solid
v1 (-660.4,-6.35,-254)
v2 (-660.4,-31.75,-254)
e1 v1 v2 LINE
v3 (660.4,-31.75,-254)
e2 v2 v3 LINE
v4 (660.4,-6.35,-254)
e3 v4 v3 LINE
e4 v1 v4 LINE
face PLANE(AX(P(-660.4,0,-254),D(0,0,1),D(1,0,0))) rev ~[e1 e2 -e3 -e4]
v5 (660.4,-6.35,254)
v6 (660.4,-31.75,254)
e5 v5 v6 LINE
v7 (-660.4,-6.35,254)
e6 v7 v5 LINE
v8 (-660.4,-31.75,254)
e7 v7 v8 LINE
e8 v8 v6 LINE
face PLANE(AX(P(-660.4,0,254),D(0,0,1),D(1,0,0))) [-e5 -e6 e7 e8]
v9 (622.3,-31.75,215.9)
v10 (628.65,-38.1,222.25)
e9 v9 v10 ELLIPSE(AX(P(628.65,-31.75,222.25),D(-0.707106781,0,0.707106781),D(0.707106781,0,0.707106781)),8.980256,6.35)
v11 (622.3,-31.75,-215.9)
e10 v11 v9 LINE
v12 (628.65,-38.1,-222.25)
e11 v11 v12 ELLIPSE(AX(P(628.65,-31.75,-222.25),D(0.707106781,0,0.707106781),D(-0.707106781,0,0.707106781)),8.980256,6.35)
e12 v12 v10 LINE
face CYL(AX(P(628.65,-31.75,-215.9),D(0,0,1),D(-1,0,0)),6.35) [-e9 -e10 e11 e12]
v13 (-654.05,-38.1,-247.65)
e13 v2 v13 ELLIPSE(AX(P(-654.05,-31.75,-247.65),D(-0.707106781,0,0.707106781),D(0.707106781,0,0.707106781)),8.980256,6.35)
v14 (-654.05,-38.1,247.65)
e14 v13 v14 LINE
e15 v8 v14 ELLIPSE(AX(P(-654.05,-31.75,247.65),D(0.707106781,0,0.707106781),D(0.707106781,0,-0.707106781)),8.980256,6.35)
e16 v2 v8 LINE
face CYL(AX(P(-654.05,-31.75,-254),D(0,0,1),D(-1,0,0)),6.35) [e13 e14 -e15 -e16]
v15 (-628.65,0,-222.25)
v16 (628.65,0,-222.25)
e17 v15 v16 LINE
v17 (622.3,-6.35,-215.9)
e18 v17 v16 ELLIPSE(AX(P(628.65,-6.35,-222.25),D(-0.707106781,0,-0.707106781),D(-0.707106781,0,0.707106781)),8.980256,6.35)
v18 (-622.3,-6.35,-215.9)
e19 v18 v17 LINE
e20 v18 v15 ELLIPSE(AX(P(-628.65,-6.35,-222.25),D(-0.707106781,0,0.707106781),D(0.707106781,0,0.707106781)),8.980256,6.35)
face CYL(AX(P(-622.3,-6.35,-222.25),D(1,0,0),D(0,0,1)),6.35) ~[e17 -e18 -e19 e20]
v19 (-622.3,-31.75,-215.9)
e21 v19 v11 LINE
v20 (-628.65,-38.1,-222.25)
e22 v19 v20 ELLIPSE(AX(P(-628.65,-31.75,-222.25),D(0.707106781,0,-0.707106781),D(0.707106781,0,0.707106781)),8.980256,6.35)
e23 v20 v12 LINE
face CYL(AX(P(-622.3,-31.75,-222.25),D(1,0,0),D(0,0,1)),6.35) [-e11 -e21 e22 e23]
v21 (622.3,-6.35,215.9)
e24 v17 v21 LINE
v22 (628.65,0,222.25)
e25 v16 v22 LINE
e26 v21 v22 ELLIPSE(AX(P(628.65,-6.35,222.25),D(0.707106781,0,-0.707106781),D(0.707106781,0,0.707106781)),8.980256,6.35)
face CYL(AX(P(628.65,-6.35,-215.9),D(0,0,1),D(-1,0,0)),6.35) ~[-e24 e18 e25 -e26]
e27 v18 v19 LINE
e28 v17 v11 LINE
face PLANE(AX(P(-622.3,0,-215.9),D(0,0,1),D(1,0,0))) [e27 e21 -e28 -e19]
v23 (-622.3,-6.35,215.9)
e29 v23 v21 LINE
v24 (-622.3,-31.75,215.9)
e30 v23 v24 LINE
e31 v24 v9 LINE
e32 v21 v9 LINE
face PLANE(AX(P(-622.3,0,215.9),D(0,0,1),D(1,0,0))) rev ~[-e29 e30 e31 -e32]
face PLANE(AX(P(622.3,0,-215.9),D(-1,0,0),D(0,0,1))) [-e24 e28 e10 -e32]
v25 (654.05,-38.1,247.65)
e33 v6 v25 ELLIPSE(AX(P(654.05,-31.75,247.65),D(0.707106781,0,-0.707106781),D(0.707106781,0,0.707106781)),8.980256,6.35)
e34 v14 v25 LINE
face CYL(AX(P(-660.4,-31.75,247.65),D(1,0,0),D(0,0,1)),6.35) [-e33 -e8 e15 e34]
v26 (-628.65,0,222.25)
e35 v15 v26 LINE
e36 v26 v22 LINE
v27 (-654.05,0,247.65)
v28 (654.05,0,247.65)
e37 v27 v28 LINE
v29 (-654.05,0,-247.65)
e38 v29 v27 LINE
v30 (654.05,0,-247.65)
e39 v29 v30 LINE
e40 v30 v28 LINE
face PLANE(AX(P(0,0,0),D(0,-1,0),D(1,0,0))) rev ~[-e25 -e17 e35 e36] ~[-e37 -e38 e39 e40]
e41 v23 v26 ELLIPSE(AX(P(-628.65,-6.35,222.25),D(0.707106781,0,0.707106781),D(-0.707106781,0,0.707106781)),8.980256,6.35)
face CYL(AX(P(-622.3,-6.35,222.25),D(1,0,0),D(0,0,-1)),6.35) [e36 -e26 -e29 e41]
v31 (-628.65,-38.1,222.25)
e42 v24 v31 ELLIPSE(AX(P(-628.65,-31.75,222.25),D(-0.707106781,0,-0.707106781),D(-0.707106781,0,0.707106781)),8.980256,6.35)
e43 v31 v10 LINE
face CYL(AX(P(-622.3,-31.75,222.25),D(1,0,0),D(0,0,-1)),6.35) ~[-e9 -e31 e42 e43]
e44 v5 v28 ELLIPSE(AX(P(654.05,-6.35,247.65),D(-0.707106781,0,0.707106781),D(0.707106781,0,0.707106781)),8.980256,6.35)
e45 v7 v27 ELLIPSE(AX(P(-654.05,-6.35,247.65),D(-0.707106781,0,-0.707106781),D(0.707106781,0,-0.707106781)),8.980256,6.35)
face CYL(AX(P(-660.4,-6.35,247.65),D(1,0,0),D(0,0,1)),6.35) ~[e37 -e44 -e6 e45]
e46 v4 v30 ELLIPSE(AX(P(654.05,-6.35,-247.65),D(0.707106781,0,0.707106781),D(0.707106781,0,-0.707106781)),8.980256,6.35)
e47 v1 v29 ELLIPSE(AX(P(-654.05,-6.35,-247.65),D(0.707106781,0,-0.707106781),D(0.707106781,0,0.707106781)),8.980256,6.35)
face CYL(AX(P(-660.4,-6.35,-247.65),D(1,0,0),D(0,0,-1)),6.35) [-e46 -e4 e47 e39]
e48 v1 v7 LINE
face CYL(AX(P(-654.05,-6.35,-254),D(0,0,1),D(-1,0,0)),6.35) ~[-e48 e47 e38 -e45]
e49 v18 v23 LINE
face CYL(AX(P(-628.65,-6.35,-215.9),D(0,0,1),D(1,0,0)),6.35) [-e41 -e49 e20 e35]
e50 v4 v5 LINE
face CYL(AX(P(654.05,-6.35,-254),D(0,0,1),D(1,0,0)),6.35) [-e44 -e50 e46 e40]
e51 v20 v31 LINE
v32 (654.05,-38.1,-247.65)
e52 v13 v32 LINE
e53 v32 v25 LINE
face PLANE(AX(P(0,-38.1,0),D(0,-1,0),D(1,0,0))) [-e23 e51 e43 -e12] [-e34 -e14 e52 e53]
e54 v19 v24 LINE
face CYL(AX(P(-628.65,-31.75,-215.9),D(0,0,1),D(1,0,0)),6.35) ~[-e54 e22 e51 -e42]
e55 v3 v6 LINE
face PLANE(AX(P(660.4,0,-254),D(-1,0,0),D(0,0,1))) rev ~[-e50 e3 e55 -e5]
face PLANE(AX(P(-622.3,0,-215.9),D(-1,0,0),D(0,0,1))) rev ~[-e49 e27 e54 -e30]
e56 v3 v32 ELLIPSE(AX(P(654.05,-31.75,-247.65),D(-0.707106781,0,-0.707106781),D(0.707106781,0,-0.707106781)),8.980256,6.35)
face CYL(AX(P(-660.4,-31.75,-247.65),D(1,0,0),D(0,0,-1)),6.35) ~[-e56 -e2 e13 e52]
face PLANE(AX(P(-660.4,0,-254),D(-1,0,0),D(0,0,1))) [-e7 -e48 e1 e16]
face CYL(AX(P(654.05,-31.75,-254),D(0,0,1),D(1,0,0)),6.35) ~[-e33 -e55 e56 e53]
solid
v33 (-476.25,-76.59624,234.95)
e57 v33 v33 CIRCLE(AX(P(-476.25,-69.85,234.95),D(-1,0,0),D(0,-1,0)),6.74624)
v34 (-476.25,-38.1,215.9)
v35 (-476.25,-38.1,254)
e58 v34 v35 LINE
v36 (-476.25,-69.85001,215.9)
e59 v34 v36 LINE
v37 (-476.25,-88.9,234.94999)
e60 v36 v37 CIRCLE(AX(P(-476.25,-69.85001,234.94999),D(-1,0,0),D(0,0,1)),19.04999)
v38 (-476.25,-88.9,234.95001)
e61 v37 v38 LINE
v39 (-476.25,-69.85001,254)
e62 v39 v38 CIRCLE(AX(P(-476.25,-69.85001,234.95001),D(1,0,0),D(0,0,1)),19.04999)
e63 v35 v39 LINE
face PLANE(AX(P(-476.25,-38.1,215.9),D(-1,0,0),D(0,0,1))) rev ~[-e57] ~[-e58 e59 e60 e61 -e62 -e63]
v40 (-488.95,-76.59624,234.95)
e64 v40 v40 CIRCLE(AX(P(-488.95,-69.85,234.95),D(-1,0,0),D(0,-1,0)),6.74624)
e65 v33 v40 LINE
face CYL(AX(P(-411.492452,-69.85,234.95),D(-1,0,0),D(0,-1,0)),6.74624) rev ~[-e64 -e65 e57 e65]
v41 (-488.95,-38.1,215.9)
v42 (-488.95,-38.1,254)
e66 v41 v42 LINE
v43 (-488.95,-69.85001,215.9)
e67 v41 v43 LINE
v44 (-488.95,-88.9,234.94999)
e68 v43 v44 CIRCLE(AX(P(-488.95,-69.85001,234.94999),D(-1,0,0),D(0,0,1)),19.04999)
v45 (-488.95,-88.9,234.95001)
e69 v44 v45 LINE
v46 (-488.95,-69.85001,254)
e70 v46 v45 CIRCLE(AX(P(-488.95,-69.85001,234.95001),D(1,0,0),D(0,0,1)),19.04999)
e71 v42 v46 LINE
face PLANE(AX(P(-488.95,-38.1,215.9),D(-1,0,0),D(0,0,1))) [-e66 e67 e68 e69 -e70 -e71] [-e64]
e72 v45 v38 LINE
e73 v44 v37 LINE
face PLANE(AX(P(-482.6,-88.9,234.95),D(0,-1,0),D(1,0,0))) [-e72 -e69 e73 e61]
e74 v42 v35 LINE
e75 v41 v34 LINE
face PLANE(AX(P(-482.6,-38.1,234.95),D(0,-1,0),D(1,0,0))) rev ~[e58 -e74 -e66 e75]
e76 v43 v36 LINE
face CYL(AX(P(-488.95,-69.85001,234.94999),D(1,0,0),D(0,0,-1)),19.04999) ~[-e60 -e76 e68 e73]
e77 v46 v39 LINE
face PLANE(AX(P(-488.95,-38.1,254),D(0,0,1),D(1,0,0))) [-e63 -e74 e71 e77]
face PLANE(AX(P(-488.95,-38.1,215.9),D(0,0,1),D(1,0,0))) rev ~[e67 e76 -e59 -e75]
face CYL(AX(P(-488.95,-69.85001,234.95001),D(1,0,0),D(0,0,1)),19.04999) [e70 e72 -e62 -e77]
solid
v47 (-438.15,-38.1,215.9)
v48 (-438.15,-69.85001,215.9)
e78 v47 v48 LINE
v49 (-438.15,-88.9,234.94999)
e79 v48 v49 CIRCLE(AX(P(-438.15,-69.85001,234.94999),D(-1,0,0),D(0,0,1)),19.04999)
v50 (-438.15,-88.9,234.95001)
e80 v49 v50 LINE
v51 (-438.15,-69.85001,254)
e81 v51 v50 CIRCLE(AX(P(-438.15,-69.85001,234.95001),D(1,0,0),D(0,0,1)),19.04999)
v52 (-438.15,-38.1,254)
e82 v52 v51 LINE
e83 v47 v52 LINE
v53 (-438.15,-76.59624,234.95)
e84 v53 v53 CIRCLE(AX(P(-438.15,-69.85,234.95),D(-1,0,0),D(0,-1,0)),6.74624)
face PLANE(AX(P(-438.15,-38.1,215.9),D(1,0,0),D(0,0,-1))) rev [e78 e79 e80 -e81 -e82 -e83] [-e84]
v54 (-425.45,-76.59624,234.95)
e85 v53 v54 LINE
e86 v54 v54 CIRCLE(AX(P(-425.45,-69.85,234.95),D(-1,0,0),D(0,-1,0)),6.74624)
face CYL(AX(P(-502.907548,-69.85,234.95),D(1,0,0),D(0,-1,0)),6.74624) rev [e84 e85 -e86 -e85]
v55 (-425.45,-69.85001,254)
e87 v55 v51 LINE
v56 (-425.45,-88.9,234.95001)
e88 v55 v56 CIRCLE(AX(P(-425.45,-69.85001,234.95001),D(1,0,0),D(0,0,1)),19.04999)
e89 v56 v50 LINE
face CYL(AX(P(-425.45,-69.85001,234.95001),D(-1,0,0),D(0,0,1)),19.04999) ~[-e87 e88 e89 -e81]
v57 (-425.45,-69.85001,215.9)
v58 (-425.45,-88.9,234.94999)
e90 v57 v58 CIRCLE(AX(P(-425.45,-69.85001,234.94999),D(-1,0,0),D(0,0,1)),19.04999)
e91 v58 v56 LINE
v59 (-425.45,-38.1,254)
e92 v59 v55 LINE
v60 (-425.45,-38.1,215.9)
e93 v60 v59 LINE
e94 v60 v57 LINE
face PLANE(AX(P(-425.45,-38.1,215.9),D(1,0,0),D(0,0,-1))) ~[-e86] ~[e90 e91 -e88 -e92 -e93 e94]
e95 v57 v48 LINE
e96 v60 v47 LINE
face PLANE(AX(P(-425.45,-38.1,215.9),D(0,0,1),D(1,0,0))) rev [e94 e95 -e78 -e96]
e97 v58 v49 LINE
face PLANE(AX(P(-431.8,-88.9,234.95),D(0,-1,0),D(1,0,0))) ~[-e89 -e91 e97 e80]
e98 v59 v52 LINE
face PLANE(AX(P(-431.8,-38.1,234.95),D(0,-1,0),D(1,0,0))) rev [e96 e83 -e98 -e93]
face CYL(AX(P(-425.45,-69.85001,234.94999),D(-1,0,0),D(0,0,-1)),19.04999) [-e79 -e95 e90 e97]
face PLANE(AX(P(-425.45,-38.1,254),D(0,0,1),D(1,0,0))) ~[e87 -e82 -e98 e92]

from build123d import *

# Parameters (mm, degrees)
F0_W     = 1320.8
F0_H     = 508
F0_W_2   = 1244.6
F0_H_2   = 431.8
F1_DEPTH = 38.1
F2_R     = 6.35
F3_W     = 12.7
F3_H     = 38.1
F4_DEPTH = 50.8
F5_R     = 19.04999
F7_D     = 13.49248


# Not quite as in the source:
# - a fillet or chamfer is up to 0.001 mm smaller than in the source, because OpenCascade refuses the exact size


with BuildPart() as f1:
    # F0 (on Front) → F1 (new body)
    with BuildSketch(Plane.XZ):
        Rectangle(F0_W, F0_H)
        Rectangle(F0_W_2, F0_H_2, mode=Mode.SUBTRACT)
    extrude(amount=F1_DEPTH)

    # F2
    f2_edges = [f1.edges().sort_by_distance(p)[0] for p in [
        (0, -38.1, 254),
        (-660.4, -38.1, 0),
        (0, -38.1, -254),
        (660.4, -38.1, 0),
        (-622.3, -38.1, 0),
        (0, -38.1, 215.9),
        (622.3, -38.1, 0),
        (0, -38.1, -215.9),
        (0, 0, 254),
        (-660.4, 0, 0),
        (0, 0, -254),
        (660.4, 0, 0),
        (-622.3, 0, 0),
        (0, 0, 215.9),
        (622.3, 0, 0),
        (0, 0, -215.9),
    ]]
    fillet(f2_edges, radius=F2_R)


with BuildPart() as f4:
    # F3 (on face) → F4 (new body)
    with BuildSketch(Plane.XZ.offset(38.1)):
        with Locations((-482.6, 234.95)):
            Rectangle(F3_W, F3_H)
    extrude(amount=F4_DEPTH)

    # F5 (radius 19.05 in the source; OpenCascade refuses exactly that, so slightly less here)
    f5_edges = [f4.edges().sort_by_distance(p)[0] for p in [
        (-482.6, -88.9, 254),
        (-482.6, -88.9, 215.9),
    ]]
    fillet(f5_edges, radius=F5_R)

    # F7 (through all)
    with Locations(Plane.YZ.offset(-476.25)):
        with Locations((-69.85, 234.95)):
            Hole(F7_D / 2)


with BuildPart() as f9_1:
    # F9: instance of F4
    add(f4.part.mirror(Plane(origin=(-457.2, -60.9330603651, 234.95), x_dir=(0, 1, 0), z_dir=(1, 0, 0))))


solid = Compound([f1.part, f4.part, f9_1.part])
